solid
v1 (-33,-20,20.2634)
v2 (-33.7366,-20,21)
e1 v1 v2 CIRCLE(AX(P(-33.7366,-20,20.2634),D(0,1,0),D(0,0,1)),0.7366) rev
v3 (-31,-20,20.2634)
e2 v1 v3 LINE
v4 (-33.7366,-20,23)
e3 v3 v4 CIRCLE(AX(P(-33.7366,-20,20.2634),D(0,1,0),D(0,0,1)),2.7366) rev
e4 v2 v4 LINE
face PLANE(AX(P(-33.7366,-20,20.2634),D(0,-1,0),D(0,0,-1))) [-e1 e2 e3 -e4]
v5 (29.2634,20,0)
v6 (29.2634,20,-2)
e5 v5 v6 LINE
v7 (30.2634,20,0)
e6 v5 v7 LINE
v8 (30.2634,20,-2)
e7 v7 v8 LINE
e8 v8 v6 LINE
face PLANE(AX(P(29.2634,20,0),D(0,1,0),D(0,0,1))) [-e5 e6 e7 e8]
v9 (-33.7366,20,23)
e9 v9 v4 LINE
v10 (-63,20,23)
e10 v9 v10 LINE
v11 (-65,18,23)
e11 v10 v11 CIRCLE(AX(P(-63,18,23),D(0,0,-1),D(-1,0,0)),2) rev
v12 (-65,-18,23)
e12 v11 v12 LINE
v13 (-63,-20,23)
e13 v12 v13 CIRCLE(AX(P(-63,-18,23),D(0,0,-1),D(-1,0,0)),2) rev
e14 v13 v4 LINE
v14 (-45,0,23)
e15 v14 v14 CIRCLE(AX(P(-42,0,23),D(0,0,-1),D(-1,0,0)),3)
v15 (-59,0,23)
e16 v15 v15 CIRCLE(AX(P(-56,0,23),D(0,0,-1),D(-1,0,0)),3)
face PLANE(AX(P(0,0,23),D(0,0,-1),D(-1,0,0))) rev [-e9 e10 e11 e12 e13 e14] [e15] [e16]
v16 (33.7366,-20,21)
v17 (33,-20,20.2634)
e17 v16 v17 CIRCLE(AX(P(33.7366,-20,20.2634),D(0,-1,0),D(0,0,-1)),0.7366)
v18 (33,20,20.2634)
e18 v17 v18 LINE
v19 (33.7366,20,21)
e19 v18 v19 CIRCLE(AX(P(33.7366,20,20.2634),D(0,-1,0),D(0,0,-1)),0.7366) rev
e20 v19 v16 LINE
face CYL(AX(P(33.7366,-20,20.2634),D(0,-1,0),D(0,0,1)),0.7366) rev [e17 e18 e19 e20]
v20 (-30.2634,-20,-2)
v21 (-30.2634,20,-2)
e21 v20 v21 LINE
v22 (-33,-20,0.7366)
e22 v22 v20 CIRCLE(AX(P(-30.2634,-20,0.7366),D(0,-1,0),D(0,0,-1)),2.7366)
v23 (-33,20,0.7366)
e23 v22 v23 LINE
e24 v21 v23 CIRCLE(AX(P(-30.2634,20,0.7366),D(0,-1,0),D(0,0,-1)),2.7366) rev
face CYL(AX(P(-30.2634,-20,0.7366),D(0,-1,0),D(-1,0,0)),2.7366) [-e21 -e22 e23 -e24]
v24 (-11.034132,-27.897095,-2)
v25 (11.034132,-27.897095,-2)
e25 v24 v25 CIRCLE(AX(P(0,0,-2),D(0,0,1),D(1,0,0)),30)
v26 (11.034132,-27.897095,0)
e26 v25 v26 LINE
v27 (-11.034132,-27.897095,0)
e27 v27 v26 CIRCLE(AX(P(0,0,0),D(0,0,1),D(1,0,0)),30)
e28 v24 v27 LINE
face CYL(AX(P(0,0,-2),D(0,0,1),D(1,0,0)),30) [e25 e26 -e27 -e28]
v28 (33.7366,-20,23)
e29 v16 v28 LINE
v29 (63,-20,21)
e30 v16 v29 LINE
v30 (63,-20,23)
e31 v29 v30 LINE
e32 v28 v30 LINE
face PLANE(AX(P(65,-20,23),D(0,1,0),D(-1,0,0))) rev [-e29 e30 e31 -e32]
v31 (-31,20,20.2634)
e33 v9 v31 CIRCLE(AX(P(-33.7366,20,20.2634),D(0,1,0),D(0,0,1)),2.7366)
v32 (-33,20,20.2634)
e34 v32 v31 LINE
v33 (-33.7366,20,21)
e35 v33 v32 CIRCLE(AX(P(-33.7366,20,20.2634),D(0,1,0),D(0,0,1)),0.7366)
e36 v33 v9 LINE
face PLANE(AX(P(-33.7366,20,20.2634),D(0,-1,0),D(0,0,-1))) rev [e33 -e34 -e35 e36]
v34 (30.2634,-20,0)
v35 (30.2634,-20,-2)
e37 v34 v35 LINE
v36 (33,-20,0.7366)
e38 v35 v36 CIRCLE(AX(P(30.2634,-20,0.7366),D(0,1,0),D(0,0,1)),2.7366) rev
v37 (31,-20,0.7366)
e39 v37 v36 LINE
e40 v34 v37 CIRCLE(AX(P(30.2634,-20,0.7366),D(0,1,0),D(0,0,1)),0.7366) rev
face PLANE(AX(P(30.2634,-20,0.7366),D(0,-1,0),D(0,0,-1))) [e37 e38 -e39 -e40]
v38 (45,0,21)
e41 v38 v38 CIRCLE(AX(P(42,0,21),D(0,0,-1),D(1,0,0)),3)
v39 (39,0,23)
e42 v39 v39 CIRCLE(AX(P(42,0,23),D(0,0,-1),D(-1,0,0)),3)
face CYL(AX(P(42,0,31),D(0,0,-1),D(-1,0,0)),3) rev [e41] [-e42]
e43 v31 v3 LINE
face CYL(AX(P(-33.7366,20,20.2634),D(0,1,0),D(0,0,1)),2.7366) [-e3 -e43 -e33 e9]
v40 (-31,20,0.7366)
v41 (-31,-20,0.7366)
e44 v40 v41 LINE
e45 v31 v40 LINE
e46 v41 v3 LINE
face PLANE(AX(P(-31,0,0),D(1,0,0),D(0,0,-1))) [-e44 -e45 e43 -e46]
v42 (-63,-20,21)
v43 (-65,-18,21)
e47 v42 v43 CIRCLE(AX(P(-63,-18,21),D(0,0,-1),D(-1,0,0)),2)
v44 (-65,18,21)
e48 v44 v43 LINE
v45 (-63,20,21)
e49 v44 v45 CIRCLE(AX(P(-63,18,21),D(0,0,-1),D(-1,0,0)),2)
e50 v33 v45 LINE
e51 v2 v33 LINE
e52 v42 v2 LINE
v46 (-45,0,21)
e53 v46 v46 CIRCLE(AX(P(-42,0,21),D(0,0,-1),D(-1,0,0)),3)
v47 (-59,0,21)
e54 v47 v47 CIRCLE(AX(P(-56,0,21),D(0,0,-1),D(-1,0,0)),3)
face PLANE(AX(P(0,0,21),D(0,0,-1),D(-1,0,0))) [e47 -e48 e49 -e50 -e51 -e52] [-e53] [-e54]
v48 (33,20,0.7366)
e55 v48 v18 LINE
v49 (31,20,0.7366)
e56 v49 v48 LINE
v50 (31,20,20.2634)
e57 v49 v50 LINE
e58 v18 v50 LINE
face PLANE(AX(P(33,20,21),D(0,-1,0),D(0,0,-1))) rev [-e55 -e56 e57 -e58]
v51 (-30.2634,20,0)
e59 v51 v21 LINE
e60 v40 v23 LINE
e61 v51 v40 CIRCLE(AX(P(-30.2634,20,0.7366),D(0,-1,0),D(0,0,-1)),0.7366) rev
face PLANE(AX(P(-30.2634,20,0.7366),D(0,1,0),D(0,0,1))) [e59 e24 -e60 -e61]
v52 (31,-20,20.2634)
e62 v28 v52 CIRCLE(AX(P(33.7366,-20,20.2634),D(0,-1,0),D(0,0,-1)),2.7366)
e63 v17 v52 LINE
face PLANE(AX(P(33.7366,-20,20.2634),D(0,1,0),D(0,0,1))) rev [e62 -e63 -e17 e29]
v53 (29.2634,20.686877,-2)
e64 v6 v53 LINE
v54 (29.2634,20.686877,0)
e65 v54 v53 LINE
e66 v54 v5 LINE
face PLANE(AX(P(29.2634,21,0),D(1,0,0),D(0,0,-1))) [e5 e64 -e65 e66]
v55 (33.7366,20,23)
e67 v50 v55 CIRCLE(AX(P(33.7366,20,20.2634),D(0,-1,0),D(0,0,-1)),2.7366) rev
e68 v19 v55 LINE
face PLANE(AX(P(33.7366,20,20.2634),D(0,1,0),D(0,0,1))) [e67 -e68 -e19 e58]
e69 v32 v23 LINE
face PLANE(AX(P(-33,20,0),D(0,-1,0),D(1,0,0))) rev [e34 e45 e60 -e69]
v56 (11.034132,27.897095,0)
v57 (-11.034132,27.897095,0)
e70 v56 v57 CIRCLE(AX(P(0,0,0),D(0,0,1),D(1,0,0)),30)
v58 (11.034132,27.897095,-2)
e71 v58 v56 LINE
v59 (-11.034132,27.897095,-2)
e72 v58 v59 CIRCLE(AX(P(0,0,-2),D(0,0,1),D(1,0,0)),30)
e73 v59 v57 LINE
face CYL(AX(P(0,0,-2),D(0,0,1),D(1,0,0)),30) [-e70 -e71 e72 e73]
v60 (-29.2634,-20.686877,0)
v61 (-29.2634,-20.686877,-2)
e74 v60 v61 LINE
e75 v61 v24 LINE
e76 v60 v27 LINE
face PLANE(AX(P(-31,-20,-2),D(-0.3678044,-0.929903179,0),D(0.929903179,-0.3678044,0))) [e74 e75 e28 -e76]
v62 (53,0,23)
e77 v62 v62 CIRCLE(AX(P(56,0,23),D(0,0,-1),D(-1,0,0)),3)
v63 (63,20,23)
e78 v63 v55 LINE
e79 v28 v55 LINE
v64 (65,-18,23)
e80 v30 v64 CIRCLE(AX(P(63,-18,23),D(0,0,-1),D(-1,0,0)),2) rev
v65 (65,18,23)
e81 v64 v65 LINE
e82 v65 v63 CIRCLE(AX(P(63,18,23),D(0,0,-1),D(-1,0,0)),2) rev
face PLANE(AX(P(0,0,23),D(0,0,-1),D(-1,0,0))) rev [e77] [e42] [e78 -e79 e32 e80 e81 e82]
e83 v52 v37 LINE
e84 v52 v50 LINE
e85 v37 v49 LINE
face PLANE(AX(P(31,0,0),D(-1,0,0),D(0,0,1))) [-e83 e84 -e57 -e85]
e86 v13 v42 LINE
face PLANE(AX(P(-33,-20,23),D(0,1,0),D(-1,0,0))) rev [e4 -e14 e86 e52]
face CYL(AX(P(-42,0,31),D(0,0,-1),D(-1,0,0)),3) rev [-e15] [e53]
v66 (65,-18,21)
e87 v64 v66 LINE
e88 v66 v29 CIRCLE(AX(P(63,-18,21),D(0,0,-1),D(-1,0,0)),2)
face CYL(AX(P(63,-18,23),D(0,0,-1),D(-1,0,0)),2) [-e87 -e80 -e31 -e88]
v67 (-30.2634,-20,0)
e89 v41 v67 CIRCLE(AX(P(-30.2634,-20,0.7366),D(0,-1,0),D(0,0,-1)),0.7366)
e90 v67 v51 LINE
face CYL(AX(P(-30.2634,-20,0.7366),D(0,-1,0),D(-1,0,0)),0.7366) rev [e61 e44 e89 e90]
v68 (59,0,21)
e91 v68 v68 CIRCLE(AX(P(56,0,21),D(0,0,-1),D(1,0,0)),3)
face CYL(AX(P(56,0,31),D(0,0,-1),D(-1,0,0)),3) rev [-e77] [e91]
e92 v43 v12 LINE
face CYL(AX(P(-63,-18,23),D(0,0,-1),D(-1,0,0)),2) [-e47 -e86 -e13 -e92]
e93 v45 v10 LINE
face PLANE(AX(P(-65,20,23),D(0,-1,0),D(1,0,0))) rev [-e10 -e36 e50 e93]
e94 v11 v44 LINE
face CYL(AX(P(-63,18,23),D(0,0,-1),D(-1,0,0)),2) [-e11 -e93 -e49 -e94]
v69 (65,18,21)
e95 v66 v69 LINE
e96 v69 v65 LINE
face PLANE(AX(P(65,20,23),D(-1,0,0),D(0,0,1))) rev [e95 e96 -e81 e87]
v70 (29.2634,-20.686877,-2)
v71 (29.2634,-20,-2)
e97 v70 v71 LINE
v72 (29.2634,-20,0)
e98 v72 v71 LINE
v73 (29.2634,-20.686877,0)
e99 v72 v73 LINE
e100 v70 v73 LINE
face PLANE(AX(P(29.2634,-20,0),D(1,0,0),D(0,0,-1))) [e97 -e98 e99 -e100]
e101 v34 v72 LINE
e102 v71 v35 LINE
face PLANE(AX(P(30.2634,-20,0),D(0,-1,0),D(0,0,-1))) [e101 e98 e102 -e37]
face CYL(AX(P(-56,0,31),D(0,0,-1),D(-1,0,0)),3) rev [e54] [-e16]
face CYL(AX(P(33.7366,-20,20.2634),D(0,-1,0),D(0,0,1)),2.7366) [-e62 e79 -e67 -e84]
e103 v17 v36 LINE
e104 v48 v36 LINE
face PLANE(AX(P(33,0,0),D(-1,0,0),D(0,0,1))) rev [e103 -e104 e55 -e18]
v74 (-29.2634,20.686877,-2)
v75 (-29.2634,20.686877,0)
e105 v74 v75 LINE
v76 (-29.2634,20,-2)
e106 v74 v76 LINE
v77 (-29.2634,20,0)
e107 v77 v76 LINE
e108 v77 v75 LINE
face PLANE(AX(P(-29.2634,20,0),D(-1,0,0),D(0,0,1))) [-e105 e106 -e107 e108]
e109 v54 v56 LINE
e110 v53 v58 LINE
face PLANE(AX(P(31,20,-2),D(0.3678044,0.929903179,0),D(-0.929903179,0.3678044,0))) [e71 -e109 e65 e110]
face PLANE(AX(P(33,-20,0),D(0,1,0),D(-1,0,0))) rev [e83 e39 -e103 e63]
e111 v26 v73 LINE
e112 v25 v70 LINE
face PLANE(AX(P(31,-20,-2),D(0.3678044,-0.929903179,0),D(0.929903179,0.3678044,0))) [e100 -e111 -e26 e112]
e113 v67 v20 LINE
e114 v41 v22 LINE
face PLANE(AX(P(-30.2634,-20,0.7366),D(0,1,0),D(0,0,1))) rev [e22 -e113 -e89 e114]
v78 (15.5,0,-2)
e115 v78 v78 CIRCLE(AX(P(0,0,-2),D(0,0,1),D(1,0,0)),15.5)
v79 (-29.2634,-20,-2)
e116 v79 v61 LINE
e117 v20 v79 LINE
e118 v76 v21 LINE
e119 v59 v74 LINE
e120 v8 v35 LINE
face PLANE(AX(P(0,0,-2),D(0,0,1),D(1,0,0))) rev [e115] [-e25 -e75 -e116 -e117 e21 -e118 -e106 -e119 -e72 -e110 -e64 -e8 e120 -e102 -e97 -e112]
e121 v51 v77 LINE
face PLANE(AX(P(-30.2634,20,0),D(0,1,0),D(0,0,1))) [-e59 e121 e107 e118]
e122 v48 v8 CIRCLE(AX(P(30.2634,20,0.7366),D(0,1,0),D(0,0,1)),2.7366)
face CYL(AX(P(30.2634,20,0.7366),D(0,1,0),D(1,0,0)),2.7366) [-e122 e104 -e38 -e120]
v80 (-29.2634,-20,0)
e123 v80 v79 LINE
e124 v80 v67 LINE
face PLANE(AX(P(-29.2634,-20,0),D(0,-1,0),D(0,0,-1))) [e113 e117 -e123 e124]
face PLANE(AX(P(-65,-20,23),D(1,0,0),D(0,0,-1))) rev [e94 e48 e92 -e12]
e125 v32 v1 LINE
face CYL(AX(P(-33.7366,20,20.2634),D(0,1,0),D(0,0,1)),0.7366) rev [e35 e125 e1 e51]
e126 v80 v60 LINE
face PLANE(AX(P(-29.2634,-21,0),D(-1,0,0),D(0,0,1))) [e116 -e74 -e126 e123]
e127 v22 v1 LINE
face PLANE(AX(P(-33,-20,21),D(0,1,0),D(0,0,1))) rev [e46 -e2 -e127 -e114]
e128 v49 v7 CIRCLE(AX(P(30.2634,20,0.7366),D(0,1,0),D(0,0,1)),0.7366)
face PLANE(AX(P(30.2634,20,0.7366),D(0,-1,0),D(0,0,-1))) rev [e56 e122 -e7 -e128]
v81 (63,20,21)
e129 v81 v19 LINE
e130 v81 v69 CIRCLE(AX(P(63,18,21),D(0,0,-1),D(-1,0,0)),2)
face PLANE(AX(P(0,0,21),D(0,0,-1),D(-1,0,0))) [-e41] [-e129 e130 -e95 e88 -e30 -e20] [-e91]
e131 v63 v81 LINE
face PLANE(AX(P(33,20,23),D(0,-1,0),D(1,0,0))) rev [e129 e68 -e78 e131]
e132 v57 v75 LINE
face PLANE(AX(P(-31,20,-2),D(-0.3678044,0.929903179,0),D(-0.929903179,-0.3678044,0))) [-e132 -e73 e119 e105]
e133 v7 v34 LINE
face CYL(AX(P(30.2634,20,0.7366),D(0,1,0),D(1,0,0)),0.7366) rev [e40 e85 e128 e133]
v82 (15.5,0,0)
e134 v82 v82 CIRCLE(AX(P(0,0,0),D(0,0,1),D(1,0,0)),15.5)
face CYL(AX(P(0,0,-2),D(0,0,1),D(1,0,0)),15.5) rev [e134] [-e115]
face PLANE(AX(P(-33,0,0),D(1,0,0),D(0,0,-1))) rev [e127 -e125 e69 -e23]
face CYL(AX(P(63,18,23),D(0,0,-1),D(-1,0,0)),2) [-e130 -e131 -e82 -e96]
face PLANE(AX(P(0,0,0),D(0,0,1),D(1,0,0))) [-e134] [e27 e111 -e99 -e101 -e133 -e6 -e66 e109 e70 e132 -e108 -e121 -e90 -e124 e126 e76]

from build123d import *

# Parameters (mm, degrees)
SKETCH1_R                       = 15.5
BASE_FLANGE1_DEPTH              = 2
EDGE_FLANGE1_STRIP_W            = 9.4732
EDGE_FLANGE1_STRIP_H            = 2
EDGE_FLANGE1_STRIP_CUT_DEPTH    = 40
EDGE_FLANGE1_RELIEF_W           = 10.4732
EDGE_FLANGE1_RELIEF_H           = 1
EDGE_FLANGE1_RELIEF_CUT_DEPTH   = 2
EDGE_FLANGE1_STRIP_2_W          = 9.4732
EDGE_FLANGE1_STRIP_2_H          = 2
EDGE_FLANGE1_STRIP_CUT_2_DEPTH  = 40
EDGE_FLANGE1_RELIEF_2_W         = 10.4732
EDGE_FLANGE1_RELIEF_2_H         = 1
EDGE_FLANGE1_RELIEF_CUT_2_DEPTH = 2
EDGE_FLANGE1_DEPTH              = 40
EDGE_FLANGE1_BEND_DEPTH         = 40
EDGE_FLANGE2_STRIP_W            = 9.4732
EDGE_FLANGE2_STRIP_H            = 2
EDGE_FLANGE2_STRIP_CUT_DEPTH    = 40
EDGE_FLANGE2_STRIP_2_W          = 9.4732
EDGE_FLANGE2_STRIP_2_H          = 2
EDGE_FLANGE2_STRIP_CUT_2_DEPTH  = 40
EDGE_FLANGE2_DEPTH              = 40
EDGE_FLANGE2_BEND_DEPTH         = 40
SKETCH17_R                      = 3
CUT_EXTRUDE1_DEPTH              = 10
FILLET1_R                       = 2


# Sheet-metal steps are written as plain solids
with BuildPart() as part:
    # Sketch1 → Base-Flange1 (new body)
    with BuildSketch(Plane.XY):
        with BuildLine():
            Line((-31, 20), (-11.034132012, 27.897095382))
            ThreePointArc((-11.034132012, 27.897095382), (0, 30), (11.034132012, 27.897095382))
            Line((11.034132012, 27.897095382), (31, 20))
            Line((31, 20), (31, -20))
            Line((31, -20), (11.034132012, -27.897095382))
            ThreePointArc((11.034132012, -27.897095382), (0, -30), (-11.034132012, -27.897095382))
            Line((-11.034132012, -27.897095382), (-31, -20))
            Line((-31, -20), (-31, 20))
        make_face()
        Circle(SKETCH1_R, mode=Mode.SUBTRACT)
    extrude(amount=-BASE_FLANGE1_DEPTH)

    # Edge-Flange1 strip (across the edge) → Edge-Flange1 strip cut (cut)
    with BuildSketch(Plane(origin=(-31, 20, 0), x_dir=(1, 0, 0), z_dir=(0, -1, 0))):
        with Locations((-4, -1)):
            Rectangle(EDGE_FLANGE1_STRIP_W, EDGE_FLANGE1_STRIP_H)
    extrude(amount=EDGE_FLANGE1_STRIP_CUT_DEPTH, mode=Mode.SUBTRACT)

    # Edge-Flange1 relief (on the sheet) → Edge-Flange1 relief cut (cut)
    with BuildSketch(Plane(origin=(-30.2634, 20, 0), x_dir=(1, 0, 0), z_dir=(0, 0, 1))):
        with Locations((-4.2366, 0.5)):
            Rectangle(EDGE_FLANGE1_RELIEF_W, EDGE_FLANGE1_RELIEF_H)
        with Locations((-4.2366, -40.5)):
            Rectangle(EDGE_FLANGE1_RELIEF_W, EDGE_FLANGE1_RELIEF_H)
    extrude(amount=-EDGE_FLANGE1_RELIEF_CUT_DEPTH, mode=Mode.SUBTRACT)

    # Edge-Flange1 strip 2 (across the edge) → Edge-Flange1 strip cut 2 (cut)
    with BuildSketch(Plane(origin=(31, -20, 0), x_dir=(-1, 0, 0), z_dir=(0, 1, 0))):
        with Locations((-4, -1)):
            Rectangle(EDGE_FLANGE1_STRIP_2_W, EDGE_FLANGE1_STRIP_2_H)
    extrude(amount=EDGE_FLANGE1_STRIP_CUT_2_DEPTH, mode=Mode.SUBTRACT)

    # Edge-Flange1 relief 2 (on the sheet) → Edge-Flange1 relief cut 2 (cut)
    with BuildSketch(Plane(origin=(30.2634, -20, 0), x_dir=(-1, 0, 0), z_dir=(0, 0, 1))):
        with Locations((-4.2366, 0.5)):
            Rectangle(EDGE_FLANGE1_RELIEF_2_W, EDGE_FLANGE1_RELIEF_2_H)
        with Locations((-4.2366, -40.5)):
            Rectangle(EDGE_FLANGE1_RELIEF_2_W, EDGE_FLANGE1_RELIEF_2_H)
    extrude(amount=-EDGE_FLANGE1_RELIEF_CUT_2_DEPTH, mode=Mode.SUBTRACT)

    # Edge-Flange1 section (across the edge) → Edge-Flange1 (add)
    with BuildSketch(Plane(origin=(-31, 20, 0), x_dir=(1, 0, 0), z_dir=(0, -1, 0))):
        with BuildLine():
            Line((-2, 0.7366), (-2, 21))
            Line((-2, 21), (0, 21))
            Line((0, 21), (0, 0.7366))
            ThreePointArc((0, 0.7366), (0.215745145, 0.215745145), (0.7366, 0))
            Line((0.7366, 0), (0.7366, -2))
            ThreePointArc((0.7366, -2), (-1.198468417, -1.198468417), (-2, 0.7366))
        make_face()
    extrude(amount=EDGE_FLANGE1_DEPTH)

    # Edge-Flange1 section 2 (across the edge) → Edge-Flange1 bend (add)
    with BuildSketch(Plane(origin=(31, -20, 0), x_dir=(-1, 0, 0), z_dir=(0, 1, 0))):
        with BuildLine():
            Line((-2, 0.7366), (-2, 21))
            Line((-2, 21), (0, 21))
            Line((0, 21), (0, 0.7366))
            ThreePointArc((0, 0.7366), (0.215745145, 0.215745145), (0.7366, 0))
            Line((0.7366, 0), (0.7366, -2))
            ThreePointArc((0.7366, -2), (-1.198468417, -1.198468417), (-2, 0.7366))
        make_face()
    extrude(amount=EDGE_FLANGE1_BEND_DEPTH)

    # Edge-Flange2 strip (across the edge) → Edge-Flange2 strip cut (cut)
    with BuildSketch(Plane(origin=(-33, -20, 21), x_dir=(0, 0, -1), z_dir=(0, 1, 0))):
        with Locations((-4, -1)):
            Rectangle(EDGE_FLANGE2_STRIP_W, EDGE_FLANGE2_STRIP_H)
    extrude(amount=EDGE_FLANGE2_STRIP_CUT_DEPTH, mode=Mode.SUBTRACT)

    # Edge-Flange2 strip 2 (across the edge) → Edge-Flange2 strip cut 2 (cut)
    with BuildSketch(Plane(origin=(33, 20, 21), x_dir=(0, 0, -1), z_dir=(0, -1, 0))):
        with Locations((-4, -1)):
            Rectangle(EDGE_FLANGE2_STRIP_2_W, EDGE_FLANGE2_STRIP_2_H)
    extrude(amount=EDGE_FLANGE2_STRIP_CUT_2_DEPTH, mode=Mode.SUBTRACT)

    # Edge-Flange2 section (across the edge) → Edge-Flange2 (add)
    with BuildSketch(Plane(origin=(-33, -20, 21), x_dir=(0, 0, -1), z_dir=(0, 1, 0))):
        with BuildLine():
            Line((-2, 0.7366), (-2, 32))
            Line((-2, 32), (0, 32))
            Line((0, 32), (0, 0.7366))
            ThreePointArc((0, 0.7366), (0.215745145, 0.215745145), (0.7366, 0))
            Line((0.7366, 0), (0.7366, -2))
            ThreePointArc((0.7366, -2), (-1.198468417, -1.198468417), (-2, 0.7366))
        make_face()
    extrude(amount=EDGE_FLANGE2_DEPTH)

    # Edge-Flange2 section 2 (across the edge) → Edge-Flange2 bend (add)
    with BuildSketch(Plane(origin=(33, 20, 21), x_dir=(0, 0, -1), z_dir=(0, -1, 0))):
        with BuildLine():
            Line((-2, 0.7366), (-2, 32))
            Line((-2, 32), (0, 32))
            Line((0, 32), (0, 0.7366))
            ThreePointArc((0, 0.7366), (0.215745145, 0.215745145), (0.7366, 0))
            Line((0.7366, 0), (0.7366, -2))
            ThreePointArc((0.7366, -2), (-1.198468417, -1.198468417), (-2, 0.7366))
        make_face()
    extrude(amount=EDGE_FLANGE2_BEND_DEPTH)

    # Sketch17 → Cut-Extrude1 (cut)
    with BuildSketch(Plane(origin=(0, 0, 21), x_dir=(-1, 0, 0), z_dir=(0, 0, -1))):
        with Locations((56, 0)):
            Circle(SKETCH17_R)
        with Locations((42, 0)):
            Circle(SKETCH17_R)
        with Locations((-56, 0)):
            Circle(SKETCH17_R)
        with Locations((-42, 0)):
            Circle(SKETCH17_R)
    extrude(amount=-CUT_EXTRUDE1_DEPTH, mode=Mode.SUBTRACT)

    # Fillet1
    fillet1_edges = [part.edges().sort_by_distance(p)[0] for p in [
        (-65, -20, 22),
        (-65, 20, 22),
        (65, 20, 22),
        (65, -20, 22),
    ]]
    fillet(fillet1_edges, radius=FILLET1_R)


solid = part.part
